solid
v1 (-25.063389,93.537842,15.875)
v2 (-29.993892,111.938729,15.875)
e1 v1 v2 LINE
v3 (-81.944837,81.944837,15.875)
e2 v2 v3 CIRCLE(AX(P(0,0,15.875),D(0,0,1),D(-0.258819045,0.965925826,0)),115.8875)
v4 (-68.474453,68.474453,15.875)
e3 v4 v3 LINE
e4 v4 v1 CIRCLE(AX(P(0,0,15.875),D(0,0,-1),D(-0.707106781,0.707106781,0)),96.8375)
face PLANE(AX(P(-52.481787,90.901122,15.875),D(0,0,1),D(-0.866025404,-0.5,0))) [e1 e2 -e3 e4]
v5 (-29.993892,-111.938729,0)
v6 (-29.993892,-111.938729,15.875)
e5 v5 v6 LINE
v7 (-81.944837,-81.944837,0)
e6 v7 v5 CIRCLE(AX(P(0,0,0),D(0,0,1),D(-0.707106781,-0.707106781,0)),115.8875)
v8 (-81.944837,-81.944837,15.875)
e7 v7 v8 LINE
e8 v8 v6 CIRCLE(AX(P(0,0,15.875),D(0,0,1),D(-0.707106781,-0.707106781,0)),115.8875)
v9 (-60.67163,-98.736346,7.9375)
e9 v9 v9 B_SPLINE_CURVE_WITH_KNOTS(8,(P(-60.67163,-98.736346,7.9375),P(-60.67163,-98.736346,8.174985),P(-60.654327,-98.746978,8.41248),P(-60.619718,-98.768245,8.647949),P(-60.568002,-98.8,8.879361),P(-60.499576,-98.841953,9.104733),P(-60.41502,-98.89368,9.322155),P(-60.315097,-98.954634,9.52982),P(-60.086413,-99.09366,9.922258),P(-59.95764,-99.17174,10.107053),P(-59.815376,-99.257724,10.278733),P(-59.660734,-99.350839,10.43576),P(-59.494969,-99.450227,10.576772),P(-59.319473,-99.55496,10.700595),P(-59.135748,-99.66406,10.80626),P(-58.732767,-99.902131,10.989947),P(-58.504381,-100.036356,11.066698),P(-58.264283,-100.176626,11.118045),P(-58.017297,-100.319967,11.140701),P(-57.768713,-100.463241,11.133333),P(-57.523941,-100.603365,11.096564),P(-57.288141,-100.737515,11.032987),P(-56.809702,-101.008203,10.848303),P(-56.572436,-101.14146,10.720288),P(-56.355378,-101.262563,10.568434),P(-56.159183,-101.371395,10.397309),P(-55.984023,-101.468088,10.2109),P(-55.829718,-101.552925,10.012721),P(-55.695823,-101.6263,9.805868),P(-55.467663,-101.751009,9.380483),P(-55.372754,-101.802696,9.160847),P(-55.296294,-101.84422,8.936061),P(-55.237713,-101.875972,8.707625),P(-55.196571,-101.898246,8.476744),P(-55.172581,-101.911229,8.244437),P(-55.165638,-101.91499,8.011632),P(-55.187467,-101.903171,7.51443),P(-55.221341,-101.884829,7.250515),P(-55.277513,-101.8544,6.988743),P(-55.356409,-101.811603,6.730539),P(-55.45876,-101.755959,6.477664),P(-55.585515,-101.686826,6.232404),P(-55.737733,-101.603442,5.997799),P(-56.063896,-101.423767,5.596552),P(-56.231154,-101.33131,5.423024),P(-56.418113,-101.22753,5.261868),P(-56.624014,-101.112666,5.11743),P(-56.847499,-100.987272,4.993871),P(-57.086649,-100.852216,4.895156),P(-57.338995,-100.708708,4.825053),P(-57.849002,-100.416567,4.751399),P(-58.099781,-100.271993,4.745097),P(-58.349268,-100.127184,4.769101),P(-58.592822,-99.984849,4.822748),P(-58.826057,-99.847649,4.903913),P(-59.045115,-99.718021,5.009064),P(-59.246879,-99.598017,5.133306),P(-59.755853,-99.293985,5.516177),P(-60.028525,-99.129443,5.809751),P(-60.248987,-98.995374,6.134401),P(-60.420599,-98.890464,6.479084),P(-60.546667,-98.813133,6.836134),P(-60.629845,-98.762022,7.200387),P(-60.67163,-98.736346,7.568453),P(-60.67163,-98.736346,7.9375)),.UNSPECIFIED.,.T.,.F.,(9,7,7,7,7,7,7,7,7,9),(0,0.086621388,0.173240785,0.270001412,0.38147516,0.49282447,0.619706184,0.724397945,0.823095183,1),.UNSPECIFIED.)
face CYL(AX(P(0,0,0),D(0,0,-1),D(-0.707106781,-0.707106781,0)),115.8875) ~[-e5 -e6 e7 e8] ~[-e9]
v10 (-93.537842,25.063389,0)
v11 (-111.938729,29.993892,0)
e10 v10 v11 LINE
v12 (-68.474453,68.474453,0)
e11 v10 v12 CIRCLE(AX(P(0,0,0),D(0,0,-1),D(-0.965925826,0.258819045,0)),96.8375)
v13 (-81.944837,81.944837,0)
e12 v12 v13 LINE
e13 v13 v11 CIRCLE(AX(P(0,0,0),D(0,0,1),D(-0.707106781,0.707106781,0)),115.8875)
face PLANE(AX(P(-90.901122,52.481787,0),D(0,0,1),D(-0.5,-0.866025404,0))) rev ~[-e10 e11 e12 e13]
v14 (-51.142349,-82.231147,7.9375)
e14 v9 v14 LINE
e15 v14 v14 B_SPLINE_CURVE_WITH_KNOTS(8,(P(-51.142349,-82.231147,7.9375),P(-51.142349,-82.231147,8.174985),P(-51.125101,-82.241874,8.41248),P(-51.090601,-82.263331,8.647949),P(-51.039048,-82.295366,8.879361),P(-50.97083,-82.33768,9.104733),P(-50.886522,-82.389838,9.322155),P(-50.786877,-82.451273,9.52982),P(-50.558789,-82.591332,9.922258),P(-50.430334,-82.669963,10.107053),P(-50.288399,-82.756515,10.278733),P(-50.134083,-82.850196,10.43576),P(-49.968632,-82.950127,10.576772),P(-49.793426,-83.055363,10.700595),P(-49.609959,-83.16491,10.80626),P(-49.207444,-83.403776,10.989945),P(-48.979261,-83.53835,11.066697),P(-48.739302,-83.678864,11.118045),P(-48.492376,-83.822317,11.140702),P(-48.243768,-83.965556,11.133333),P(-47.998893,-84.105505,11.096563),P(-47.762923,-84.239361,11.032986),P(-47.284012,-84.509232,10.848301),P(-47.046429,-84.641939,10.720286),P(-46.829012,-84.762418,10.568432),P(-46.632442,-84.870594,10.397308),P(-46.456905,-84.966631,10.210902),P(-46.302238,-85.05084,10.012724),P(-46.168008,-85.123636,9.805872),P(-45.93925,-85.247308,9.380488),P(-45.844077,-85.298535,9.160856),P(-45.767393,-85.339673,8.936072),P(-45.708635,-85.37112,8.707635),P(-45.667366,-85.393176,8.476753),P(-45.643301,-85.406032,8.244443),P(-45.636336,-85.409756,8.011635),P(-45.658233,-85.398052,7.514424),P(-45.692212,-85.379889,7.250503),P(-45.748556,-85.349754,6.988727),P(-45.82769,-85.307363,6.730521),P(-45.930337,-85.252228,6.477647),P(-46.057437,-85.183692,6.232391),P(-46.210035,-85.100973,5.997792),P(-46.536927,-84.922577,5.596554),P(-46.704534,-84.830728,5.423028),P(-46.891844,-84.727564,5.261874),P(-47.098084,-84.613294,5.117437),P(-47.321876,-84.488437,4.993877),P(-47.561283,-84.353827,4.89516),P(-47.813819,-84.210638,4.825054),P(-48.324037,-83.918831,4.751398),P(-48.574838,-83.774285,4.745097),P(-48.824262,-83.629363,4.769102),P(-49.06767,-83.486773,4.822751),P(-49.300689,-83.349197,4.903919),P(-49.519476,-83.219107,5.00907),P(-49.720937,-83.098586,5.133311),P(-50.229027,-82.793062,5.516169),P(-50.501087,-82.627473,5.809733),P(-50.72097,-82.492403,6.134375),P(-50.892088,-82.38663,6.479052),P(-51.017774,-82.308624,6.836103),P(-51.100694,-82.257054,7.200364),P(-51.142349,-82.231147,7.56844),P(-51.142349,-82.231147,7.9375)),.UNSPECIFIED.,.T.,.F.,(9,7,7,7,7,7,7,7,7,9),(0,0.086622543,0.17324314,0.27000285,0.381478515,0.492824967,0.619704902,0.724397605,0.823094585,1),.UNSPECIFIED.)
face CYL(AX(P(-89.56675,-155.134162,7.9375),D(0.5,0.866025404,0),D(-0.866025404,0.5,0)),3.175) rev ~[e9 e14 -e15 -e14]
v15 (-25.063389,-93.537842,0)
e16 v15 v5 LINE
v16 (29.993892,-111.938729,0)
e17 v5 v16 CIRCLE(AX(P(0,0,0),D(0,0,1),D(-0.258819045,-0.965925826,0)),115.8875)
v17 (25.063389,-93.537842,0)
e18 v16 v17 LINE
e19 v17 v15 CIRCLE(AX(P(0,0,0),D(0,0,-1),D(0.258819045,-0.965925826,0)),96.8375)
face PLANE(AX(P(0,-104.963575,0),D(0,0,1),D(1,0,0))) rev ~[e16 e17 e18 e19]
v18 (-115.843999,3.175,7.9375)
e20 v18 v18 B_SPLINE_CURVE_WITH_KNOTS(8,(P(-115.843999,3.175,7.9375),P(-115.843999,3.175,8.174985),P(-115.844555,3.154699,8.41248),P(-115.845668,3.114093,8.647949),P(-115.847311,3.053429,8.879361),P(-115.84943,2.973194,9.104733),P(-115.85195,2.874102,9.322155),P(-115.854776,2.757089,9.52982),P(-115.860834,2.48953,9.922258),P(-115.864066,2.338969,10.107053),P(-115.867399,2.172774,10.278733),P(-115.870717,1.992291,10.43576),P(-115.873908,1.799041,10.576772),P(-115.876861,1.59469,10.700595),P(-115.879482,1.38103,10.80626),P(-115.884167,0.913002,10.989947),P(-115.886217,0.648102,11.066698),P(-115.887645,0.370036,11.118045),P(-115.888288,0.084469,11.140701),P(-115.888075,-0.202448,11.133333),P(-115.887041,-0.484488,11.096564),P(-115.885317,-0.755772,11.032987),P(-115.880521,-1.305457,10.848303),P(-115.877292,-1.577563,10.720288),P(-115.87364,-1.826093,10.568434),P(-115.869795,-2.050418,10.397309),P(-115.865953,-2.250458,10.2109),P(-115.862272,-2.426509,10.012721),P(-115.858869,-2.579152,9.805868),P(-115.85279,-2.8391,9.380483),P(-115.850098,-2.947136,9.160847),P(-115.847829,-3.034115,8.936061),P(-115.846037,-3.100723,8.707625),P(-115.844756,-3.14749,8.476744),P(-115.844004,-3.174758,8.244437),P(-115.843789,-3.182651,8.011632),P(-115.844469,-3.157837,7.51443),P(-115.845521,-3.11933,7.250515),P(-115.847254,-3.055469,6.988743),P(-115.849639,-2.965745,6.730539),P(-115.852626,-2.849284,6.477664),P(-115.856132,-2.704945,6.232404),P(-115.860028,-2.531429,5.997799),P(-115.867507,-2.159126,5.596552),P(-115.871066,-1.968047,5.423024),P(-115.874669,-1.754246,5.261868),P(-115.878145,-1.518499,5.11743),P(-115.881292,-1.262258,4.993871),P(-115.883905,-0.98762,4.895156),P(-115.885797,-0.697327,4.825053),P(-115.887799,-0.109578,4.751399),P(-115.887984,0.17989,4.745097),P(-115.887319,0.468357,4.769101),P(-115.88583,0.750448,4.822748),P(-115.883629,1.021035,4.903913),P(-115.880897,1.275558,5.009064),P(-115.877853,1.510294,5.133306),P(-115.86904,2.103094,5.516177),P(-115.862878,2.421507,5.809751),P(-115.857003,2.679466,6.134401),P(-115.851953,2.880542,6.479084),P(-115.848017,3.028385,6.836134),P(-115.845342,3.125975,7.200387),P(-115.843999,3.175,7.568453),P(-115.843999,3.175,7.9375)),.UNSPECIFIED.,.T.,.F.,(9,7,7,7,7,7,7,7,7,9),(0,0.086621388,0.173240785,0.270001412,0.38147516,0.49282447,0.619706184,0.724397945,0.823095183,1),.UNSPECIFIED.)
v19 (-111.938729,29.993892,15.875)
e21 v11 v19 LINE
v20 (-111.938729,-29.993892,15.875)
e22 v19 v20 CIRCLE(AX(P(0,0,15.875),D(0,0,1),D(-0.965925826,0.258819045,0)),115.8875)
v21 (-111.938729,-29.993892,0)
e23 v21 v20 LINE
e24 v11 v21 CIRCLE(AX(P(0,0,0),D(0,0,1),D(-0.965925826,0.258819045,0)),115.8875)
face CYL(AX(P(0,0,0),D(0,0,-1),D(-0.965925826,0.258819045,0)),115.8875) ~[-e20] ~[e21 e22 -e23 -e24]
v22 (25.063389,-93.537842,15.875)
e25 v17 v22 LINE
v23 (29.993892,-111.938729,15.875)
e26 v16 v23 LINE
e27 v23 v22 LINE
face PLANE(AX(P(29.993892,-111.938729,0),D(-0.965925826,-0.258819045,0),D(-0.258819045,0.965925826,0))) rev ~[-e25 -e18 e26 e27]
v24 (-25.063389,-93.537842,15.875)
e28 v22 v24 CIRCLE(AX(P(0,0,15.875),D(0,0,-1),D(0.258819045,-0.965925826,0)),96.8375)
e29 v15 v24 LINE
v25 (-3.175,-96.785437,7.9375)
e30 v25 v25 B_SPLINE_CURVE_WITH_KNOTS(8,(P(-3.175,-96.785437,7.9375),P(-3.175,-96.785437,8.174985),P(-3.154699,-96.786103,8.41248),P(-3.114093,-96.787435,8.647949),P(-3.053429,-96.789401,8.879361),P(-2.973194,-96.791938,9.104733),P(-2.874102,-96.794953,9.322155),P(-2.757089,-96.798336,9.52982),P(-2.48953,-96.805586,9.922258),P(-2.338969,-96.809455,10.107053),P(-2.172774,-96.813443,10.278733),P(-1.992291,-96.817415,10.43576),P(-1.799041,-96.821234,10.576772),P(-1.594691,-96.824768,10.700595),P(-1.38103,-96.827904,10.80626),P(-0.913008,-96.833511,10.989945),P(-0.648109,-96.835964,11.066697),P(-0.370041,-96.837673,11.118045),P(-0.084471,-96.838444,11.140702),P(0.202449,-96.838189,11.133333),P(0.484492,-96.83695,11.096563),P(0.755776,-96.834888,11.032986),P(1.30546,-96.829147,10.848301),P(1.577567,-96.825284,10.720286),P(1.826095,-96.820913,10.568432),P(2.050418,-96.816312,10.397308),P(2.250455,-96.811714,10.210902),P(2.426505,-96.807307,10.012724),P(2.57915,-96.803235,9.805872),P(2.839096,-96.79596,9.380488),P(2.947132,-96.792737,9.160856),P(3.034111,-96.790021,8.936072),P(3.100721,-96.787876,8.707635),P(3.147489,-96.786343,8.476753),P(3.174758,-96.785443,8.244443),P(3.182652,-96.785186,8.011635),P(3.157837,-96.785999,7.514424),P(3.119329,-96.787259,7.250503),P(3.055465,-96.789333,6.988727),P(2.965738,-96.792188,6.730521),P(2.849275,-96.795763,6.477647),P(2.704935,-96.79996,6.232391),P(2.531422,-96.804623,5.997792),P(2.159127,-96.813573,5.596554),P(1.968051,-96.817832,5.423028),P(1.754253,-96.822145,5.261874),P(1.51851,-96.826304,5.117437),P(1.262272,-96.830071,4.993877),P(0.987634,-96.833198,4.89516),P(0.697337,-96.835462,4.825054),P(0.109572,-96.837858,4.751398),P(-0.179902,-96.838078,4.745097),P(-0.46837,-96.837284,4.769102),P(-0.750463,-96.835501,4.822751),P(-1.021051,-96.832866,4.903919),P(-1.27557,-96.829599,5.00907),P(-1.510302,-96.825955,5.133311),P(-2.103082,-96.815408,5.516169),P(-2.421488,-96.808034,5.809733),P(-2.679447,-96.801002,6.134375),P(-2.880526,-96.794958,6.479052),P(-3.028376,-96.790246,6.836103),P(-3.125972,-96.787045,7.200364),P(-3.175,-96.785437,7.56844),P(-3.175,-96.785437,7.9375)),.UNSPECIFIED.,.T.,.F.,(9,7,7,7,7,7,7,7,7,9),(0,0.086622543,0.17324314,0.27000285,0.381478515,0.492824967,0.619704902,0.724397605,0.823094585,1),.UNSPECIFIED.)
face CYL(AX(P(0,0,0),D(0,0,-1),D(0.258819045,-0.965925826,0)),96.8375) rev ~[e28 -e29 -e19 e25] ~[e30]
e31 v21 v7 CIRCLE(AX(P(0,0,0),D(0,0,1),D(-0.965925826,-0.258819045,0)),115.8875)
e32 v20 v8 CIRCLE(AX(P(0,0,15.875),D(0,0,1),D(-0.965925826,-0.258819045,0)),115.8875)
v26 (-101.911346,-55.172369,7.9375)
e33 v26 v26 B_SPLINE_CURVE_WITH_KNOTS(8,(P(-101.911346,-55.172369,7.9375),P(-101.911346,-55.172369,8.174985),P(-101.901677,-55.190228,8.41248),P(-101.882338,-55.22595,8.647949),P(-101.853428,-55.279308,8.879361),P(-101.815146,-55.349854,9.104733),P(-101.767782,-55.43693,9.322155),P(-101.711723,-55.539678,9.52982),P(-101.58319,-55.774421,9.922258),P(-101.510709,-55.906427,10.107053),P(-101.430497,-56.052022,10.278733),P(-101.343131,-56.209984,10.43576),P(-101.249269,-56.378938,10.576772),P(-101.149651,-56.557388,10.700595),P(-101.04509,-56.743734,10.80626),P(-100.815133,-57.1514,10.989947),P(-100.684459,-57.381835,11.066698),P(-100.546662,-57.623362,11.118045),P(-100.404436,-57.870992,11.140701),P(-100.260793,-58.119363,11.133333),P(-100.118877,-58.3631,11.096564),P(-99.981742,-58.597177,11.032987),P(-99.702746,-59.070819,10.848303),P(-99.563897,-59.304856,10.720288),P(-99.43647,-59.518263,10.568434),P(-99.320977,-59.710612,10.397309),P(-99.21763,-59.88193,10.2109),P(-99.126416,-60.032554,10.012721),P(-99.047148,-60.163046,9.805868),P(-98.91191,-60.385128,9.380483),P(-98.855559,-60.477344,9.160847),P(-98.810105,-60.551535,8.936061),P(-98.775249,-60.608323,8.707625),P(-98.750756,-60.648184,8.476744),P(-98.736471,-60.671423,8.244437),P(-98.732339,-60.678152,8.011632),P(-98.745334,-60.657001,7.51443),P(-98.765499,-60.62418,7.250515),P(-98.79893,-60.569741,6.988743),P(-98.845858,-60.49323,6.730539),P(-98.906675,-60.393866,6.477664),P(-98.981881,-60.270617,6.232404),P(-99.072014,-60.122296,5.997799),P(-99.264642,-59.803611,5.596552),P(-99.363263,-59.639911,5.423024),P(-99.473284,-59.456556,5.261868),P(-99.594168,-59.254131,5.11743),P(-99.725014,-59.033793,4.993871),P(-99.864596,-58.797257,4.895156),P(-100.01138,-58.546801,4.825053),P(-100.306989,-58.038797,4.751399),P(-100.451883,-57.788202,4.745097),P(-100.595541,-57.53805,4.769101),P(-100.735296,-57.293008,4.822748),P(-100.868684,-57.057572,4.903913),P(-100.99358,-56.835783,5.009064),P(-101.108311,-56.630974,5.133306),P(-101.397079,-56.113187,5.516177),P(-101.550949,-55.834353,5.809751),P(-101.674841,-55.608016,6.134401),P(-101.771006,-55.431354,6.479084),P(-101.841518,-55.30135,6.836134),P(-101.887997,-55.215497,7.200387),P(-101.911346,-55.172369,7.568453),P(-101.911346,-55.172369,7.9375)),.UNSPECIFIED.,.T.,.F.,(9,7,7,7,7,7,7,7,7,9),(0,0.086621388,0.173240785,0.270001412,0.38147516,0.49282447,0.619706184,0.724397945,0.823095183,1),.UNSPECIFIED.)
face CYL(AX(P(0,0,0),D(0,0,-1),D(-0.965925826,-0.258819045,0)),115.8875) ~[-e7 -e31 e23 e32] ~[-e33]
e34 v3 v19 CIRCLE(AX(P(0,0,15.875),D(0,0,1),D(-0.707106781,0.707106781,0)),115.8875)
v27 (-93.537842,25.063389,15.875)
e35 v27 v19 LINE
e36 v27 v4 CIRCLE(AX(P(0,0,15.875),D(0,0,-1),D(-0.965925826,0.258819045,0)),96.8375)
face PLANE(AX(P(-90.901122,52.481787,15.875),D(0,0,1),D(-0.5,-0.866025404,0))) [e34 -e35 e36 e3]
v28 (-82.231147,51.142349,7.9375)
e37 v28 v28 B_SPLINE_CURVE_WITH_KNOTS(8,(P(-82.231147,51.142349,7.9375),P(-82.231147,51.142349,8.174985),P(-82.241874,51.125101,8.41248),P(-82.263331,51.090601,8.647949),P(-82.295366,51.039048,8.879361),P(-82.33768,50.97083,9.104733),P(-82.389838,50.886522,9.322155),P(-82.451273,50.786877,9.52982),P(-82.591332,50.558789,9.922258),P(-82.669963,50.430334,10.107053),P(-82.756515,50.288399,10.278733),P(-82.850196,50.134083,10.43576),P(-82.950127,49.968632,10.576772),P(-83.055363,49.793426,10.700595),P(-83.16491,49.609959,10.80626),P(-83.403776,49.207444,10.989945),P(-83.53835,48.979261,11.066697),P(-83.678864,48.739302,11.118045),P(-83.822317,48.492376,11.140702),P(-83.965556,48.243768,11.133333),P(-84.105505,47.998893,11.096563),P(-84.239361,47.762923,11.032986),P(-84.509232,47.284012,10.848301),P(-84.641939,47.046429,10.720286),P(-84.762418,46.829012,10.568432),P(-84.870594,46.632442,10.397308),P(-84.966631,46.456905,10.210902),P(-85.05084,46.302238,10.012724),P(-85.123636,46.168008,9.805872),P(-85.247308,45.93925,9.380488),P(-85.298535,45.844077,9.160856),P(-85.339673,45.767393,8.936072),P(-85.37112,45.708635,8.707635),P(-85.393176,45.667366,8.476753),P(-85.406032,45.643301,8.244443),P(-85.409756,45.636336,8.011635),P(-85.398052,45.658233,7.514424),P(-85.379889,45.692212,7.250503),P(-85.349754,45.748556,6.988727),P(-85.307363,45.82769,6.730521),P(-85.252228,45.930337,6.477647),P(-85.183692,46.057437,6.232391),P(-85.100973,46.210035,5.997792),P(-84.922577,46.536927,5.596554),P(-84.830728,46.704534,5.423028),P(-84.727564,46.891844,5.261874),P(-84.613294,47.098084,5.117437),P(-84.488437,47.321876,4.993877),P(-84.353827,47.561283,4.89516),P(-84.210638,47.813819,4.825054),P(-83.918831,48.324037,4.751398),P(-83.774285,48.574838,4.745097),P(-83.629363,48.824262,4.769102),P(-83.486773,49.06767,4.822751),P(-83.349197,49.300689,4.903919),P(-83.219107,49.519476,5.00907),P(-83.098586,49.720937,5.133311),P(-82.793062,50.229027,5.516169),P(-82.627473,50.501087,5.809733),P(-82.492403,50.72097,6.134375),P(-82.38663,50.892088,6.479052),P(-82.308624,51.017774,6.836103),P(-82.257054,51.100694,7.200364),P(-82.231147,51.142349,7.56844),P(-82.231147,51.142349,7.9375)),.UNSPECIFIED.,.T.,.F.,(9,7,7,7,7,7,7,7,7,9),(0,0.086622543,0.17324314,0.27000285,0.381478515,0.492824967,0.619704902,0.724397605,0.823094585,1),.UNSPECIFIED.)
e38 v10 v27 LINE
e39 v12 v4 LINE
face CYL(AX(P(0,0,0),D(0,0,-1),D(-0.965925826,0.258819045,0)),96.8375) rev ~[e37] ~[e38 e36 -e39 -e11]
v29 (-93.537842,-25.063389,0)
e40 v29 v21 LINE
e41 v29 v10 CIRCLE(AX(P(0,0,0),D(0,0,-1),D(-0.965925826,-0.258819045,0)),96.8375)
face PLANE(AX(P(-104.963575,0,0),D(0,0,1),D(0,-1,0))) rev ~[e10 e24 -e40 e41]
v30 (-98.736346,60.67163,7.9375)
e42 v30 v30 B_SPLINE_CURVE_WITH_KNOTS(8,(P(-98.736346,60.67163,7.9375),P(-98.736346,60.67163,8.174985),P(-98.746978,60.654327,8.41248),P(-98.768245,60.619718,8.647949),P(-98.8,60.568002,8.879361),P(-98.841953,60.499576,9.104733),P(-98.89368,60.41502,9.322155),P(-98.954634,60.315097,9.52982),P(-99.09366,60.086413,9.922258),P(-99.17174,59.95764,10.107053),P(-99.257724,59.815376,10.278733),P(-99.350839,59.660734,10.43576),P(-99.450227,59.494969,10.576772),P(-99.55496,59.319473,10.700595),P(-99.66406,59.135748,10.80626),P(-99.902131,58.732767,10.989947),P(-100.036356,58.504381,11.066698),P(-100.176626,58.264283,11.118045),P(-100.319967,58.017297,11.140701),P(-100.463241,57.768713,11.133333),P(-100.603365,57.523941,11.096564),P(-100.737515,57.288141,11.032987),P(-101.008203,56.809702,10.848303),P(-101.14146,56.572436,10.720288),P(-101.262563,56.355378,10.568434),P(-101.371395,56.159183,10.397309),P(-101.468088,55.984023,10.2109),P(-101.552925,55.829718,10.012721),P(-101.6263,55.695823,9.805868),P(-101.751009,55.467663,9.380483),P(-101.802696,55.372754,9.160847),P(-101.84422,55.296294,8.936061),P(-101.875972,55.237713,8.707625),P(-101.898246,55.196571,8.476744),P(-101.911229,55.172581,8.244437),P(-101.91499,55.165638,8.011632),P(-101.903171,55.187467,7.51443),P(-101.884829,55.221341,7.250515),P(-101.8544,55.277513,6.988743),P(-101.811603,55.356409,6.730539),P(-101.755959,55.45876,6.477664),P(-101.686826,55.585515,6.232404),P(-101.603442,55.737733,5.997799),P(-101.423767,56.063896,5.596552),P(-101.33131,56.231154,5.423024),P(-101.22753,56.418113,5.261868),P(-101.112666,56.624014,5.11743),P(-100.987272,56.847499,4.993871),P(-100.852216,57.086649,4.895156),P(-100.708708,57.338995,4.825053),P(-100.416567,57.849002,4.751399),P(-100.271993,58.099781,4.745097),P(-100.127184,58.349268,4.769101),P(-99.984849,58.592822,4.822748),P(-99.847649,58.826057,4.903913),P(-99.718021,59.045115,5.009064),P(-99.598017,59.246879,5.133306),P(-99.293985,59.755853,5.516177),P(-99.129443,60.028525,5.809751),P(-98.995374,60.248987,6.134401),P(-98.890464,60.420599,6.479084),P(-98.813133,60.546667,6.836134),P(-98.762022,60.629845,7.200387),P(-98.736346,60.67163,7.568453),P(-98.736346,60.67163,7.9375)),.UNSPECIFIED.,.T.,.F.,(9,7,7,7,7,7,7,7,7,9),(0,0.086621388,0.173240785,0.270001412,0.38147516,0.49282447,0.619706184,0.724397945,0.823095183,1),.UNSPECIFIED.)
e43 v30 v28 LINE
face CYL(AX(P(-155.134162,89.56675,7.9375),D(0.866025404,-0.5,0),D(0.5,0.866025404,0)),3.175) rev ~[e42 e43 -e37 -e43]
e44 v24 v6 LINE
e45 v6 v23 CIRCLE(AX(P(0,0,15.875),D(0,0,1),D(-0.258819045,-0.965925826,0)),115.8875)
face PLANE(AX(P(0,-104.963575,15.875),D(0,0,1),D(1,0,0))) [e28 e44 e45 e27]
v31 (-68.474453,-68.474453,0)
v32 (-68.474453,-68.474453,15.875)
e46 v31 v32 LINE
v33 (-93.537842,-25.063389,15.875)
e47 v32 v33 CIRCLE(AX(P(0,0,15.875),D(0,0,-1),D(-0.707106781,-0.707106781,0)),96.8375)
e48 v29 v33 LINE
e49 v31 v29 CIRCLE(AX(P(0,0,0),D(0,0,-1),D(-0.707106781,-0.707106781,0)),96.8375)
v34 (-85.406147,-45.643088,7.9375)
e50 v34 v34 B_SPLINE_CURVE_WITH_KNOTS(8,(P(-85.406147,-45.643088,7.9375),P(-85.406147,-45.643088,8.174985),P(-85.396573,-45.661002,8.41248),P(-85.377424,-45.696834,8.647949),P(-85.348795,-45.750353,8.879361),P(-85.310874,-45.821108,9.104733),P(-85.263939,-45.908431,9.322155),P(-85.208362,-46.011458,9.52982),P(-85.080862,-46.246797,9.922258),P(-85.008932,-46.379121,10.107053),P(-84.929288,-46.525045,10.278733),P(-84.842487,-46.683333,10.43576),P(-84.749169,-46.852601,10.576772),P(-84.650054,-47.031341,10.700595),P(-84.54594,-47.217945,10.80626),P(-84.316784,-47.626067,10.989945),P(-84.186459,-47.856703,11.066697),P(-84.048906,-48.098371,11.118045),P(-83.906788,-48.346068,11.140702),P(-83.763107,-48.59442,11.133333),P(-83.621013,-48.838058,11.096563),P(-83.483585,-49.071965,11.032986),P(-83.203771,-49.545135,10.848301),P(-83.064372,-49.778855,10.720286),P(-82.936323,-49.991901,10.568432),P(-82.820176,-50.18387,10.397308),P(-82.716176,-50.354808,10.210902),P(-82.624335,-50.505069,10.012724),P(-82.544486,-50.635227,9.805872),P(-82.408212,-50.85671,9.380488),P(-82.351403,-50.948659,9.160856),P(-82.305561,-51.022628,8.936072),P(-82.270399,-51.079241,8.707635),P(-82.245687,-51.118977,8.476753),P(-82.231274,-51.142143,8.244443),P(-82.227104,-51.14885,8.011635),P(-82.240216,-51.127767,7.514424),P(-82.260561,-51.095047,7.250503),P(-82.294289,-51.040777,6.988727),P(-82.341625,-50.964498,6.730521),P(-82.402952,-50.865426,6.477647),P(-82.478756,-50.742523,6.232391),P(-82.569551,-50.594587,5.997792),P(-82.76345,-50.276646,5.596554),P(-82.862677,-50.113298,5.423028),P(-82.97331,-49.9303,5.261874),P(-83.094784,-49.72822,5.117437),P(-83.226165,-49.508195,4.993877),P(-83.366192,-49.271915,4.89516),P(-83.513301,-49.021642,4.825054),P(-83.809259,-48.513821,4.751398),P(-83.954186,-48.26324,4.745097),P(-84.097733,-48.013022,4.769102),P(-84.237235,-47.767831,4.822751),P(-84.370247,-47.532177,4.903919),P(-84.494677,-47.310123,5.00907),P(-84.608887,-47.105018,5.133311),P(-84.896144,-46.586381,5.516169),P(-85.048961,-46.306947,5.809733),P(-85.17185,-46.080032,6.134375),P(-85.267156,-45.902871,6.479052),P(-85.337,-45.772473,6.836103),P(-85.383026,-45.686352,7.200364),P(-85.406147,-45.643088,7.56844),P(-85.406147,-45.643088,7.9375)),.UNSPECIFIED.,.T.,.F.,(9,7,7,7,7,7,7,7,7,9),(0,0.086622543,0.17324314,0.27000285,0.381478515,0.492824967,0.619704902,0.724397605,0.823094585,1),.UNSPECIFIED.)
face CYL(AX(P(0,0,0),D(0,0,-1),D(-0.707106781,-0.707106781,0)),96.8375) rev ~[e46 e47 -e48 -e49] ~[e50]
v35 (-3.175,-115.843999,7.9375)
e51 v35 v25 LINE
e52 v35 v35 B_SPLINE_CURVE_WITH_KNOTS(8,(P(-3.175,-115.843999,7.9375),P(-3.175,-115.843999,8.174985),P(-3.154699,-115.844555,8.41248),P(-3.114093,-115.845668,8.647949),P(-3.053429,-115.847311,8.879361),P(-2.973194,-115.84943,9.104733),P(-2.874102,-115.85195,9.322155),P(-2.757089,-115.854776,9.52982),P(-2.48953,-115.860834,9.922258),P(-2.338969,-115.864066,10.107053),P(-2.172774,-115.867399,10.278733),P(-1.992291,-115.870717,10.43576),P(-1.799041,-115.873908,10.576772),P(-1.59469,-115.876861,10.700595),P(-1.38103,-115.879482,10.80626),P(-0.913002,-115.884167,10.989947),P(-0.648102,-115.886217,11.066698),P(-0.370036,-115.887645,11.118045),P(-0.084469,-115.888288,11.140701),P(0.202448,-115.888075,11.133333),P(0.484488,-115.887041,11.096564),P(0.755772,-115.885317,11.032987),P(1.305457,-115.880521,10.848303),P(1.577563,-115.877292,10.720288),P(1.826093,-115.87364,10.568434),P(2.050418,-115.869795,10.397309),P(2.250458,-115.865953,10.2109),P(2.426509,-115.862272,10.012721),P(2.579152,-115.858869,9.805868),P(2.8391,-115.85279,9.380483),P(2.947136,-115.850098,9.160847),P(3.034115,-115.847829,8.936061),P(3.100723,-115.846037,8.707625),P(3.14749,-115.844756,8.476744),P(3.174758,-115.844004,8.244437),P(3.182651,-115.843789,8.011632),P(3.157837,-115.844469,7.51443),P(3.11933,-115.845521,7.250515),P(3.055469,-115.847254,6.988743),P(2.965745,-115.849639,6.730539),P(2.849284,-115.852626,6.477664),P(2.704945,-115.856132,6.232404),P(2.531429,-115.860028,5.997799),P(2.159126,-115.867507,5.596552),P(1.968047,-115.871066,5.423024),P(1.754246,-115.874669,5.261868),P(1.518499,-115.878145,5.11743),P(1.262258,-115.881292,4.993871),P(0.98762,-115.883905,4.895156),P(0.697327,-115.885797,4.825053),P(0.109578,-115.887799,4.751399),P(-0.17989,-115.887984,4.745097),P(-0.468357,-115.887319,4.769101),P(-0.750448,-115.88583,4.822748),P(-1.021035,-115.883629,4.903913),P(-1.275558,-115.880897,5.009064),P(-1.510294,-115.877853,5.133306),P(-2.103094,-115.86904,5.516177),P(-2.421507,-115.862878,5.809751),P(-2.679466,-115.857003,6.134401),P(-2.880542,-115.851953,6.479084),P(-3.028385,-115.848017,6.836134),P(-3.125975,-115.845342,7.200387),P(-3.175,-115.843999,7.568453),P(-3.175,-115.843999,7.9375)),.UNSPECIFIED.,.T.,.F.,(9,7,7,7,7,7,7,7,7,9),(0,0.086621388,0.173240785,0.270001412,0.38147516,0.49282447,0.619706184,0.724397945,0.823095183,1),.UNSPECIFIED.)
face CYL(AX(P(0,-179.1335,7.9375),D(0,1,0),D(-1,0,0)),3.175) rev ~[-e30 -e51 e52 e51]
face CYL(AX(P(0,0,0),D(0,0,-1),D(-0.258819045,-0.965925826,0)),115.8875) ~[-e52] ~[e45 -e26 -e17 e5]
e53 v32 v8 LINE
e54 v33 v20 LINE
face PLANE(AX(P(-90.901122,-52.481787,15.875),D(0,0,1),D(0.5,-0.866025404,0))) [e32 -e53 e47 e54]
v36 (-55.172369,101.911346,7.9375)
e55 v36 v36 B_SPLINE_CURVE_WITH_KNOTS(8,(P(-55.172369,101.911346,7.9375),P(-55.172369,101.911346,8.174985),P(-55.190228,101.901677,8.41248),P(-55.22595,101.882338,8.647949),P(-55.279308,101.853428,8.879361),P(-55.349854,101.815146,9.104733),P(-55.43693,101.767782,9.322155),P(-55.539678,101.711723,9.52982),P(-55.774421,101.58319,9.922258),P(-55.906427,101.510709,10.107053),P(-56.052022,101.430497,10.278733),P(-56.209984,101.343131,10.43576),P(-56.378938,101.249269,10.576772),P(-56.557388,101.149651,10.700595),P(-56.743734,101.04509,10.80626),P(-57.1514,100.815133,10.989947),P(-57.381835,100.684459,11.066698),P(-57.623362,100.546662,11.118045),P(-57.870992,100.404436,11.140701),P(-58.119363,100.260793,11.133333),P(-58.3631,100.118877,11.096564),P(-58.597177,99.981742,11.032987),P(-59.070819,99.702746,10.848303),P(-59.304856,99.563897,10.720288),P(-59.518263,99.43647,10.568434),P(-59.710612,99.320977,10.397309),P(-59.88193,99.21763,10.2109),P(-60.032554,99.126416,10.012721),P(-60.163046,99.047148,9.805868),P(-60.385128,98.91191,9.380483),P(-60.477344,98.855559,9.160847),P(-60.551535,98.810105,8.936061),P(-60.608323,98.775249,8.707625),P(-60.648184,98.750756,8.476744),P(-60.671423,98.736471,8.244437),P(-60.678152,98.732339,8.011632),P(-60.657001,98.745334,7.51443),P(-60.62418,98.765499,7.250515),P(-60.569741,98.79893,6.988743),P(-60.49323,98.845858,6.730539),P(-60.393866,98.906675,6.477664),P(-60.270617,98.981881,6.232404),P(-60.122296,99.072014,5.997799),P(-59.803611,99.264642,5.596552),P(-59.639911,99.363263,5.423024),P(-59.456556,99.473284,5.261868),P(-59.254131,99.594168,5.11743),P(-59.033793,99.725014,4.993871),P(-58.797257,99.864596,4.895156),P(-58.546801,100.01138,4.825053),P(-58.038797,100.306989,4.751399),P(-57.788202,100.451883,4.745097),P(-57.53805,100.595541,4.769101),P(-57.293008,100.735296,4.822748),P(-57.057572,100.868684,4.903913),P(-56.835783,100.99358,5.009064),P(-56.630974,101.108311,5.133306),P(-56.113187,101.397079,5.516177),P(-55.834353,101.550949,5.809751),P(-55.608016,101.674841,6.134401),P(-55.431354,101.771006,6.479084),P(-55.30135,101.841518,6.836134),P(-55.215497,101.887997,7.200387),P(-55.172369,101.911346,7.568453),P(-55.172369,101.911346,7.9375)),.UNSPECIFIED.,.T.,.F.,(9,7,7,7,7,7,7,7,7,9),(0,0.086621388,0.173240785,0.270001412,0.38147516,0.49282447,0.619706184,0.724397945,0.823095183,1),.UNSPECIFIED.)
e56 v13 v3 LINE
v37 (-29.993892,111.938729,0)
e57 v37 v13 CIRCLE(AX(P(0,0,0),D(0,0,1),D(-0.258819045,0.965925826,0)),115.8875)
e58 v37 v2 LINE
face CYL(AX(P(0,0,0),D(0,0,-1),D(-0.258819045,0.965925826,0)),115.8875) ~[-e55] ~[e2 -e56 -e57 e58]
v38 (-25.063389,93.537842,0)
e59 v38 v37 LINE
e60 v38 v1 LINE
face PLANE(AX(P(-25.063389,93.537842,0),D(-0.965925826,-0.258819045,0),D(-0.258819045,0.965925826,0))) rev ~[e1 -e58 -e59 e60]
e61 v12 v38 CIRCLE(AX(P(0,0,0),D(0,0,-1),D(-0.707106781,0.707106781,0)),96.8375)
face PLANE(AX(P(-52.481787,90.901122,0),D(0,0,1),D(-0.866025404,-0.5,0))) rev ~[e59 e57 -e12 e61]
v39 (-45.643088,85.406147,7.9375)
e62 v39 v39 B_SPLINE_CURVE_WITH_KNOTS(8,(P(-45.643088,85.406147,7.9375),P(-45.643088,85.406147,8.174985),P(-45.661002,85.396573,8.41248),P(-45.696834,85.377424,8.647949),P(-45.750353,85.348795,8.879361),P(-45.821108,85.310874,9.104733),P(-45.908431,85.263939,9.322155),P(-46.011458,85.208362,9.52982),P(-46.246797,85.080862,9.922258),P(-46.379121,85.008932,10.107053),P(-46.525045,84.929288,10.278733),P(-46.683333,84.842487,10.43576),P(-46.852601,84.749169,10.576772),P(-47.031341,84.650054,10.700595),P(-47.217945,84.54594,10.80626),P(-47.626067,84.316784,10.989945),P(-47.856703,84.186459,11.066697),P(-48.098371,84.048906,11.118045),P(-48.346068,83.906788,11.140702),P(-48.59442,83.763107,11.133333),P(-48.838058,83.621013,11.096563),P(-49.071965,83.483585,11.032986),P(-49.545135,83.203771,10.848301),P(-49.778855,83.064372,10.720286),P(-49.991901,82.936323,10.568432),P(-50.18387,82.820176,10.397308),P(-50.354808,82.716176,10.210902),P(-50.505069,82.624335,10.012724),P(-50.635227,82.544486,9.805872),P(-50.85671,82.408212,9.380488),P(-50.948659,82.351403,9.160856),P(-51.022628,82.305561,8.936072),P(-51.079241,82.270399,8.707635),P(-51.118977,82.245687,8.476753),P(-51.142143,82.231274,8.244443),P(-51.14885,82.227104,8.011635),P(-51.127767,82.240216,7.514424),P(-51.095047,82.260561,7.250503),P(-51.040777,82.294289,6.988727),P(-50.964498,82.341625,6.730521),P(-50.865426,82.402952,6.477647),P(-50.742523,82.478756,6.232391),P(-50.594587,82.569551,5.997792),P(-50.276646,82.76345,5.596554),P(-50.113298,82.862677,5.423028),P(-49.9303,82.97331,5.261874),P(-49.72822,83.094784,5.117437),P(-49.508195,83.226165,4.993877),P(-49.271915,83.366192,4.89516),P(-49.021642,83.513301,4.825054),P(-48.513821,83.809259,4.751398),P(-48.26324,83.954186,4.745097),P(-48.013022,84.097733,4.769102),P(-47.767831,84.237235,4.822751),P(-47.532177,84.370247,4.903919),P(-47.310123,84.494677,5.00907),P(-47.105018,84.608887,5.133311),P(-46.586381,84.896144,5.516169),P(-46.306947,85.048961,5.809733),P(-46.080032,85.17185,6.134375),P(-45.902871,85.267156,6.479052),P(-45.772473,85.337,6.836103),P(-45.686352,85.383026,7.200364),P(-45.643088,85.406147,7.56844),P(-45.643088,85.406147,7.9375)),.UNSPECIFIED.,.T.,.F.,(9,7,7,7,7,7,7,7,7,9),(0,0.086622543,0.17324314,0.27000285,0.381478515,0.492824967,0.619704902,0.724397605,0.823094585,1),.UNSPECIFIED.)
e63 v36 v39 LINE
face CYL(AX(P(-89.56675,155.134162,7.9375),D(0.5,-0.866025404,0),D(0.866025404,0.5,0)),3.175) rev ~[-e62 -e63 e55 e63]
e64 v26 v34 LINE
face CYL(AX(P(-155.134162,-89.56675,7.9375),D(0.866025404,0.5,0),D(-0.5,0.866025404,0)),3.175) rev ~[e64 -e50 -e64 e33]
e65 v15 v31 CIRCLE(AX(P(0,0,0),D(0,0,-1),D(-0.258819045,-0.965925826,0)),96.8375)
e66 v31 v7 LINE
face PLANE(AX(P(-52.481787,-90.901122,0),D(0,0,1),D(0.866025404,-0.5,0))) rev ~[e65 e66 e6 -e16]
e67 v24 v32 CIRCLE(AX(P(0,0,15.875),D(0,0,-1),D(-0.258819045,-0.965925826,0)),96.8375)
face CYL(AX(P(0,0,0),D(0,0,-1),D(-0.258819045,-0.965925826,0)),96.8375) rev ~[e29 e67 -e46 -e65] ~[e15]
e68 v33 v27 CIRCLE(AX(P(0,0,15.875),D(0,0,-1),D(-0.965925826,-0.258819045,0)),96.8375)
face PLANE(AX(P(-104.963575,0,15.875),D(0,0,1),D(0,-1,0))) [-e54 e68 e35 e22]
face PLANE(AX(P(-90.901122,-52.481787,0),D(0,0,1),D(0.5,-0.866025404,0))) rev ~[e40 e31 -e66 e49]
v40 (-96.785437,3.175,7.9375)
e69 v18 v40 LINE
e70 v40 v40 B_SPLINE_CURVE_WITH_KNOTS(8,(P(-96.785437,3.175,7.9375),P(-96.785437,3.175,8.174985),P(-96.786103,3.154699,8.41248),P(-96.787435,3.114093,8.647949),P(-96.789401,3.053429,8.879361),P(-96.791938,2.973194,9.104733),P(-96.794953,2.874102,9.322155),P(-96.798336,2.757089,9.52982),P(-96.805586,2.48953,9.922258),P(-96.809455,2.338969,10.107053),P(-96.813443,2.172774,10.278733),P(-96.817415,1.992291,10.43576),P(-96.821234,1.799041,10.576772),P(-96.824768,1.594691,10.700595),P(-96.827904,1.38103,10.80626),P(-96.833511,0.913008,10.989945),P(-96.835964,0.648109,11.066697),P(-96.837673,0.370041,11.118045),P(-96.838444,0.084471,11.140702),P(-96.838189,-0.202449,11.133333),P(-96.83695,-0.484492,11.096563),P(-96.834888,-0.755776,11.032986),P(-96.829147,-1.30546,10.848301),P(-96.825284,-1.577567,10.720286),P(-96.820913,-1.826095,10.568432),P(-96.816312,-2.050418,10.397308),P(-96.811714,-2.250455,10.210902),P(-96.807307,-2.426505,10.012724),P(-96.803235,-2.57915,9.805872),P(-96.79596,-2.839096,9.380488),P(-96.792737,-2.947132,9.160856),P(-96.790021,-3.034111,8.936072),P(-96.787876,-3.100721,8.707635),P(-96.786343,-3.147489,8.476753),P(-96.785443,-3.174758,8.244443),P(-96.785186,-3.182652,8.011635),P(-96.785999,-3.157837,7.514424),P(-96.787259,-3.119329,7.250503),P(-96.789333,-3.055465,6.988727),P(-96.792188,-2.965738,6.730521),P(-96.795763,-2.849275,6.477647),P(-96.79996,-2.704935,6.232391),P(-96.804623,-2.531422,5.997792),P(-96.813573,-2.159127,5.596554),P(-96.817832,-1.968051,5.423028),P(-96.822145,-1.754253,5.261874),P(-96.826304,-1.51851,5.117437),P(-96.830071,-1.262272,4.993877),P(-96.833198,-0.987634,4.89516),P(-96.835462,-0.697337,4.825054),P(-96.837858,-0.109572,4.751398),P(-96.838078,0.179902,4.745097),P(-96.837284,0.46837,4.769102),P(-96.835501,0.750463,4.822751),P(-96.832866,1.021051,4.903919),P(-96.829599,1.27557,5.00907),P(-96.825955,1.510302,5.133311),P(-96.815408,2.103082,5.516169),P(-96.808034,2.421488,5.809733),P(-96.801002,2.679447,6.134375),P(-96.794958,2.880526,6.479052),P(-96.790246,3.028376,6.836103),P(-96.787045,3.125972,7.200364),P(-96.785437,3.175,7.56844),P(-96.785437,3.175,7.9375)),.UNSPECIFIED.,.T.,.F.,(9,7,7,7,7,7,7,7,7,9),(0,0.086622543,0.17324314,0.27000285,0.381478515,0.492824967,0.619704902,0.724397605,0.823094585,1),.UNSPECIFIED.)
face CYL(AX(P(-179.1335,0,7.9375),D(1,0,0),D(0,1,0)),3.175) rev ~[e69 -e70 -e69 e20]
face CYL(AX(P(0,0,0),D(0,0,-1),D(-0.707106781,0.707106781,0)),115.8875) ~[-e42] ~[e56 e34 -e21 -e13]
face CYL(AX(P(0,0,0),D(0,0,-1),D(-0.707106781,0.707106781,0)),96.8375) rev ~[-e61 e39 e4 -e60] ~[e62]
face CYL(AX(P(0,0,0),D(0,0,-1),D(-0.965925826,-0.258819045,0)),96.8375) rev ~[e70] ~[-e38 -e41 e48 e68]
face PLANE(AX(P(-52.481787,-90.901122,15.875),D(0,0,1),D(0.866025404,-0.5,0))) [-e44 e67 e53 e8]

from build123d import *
from build123d import SkipClean  # not in build123d's __all__

# Parameters (mm, degrees)
F1_DEPTH = 15.875
F4_D     = 6.35
F4_DEPTH = 63.246
F4_TIP   = 1.9077324654
F5_COUNT = 6
F5_ANGLE = 150


with BuildPart() as f1:
    # F0 (on Top) → F1 (new body)
    with BuildSketch(Plane.XY):
        with BuildLine():
            ThreePointArc((25.0633892801, -93.5378422033), (0, -96.8375), (-25.0633892801, -93.5378422033))
            Line((-25.0633892801, -93.5378422033), (-29.9938920893, -111.9387291941))
            ThreePointArc((-29.9938920893, -111.9387291941), (0, -115.8875), (29.9938920893, -111.9387291941))
            Line((29.9938920893, -111.9387291941), (25.0633892801, -93.5378422033))
        make_face()
    extrude(amount=F1_DEPTH)

    # F4
    with Locations(Plane.XZ.offset(115.8875)):
        with Locations((0, 7.9375)):
            Hole(F4_D / 2, depth=F4_DEPTH)
            with Locations((0, 0, -(F4_DEPTH + F4_TIP / 2))):  # 118° drill point
                Cone(0, F4_D / 2, F4_TIP, mode=Mode.SUBTRACT)

    # F5: F1 ×6 about axis
    f5_axis = Axis((0, 0, 0), (0, 0, -1))


with BuildPart() as f1_1:
    add(f1.part, clean=False)
    with SkipClean():  # cleaning this boolean's faces spoils the solid; the shape is the same uncleaned
        for i in range(1, F5_COUNT):
            add(f1.part.rotate(f5_axis, i * F5_ANGLE / (F5_COUNT - 1)), clean=False)


solid = f1_1.part
